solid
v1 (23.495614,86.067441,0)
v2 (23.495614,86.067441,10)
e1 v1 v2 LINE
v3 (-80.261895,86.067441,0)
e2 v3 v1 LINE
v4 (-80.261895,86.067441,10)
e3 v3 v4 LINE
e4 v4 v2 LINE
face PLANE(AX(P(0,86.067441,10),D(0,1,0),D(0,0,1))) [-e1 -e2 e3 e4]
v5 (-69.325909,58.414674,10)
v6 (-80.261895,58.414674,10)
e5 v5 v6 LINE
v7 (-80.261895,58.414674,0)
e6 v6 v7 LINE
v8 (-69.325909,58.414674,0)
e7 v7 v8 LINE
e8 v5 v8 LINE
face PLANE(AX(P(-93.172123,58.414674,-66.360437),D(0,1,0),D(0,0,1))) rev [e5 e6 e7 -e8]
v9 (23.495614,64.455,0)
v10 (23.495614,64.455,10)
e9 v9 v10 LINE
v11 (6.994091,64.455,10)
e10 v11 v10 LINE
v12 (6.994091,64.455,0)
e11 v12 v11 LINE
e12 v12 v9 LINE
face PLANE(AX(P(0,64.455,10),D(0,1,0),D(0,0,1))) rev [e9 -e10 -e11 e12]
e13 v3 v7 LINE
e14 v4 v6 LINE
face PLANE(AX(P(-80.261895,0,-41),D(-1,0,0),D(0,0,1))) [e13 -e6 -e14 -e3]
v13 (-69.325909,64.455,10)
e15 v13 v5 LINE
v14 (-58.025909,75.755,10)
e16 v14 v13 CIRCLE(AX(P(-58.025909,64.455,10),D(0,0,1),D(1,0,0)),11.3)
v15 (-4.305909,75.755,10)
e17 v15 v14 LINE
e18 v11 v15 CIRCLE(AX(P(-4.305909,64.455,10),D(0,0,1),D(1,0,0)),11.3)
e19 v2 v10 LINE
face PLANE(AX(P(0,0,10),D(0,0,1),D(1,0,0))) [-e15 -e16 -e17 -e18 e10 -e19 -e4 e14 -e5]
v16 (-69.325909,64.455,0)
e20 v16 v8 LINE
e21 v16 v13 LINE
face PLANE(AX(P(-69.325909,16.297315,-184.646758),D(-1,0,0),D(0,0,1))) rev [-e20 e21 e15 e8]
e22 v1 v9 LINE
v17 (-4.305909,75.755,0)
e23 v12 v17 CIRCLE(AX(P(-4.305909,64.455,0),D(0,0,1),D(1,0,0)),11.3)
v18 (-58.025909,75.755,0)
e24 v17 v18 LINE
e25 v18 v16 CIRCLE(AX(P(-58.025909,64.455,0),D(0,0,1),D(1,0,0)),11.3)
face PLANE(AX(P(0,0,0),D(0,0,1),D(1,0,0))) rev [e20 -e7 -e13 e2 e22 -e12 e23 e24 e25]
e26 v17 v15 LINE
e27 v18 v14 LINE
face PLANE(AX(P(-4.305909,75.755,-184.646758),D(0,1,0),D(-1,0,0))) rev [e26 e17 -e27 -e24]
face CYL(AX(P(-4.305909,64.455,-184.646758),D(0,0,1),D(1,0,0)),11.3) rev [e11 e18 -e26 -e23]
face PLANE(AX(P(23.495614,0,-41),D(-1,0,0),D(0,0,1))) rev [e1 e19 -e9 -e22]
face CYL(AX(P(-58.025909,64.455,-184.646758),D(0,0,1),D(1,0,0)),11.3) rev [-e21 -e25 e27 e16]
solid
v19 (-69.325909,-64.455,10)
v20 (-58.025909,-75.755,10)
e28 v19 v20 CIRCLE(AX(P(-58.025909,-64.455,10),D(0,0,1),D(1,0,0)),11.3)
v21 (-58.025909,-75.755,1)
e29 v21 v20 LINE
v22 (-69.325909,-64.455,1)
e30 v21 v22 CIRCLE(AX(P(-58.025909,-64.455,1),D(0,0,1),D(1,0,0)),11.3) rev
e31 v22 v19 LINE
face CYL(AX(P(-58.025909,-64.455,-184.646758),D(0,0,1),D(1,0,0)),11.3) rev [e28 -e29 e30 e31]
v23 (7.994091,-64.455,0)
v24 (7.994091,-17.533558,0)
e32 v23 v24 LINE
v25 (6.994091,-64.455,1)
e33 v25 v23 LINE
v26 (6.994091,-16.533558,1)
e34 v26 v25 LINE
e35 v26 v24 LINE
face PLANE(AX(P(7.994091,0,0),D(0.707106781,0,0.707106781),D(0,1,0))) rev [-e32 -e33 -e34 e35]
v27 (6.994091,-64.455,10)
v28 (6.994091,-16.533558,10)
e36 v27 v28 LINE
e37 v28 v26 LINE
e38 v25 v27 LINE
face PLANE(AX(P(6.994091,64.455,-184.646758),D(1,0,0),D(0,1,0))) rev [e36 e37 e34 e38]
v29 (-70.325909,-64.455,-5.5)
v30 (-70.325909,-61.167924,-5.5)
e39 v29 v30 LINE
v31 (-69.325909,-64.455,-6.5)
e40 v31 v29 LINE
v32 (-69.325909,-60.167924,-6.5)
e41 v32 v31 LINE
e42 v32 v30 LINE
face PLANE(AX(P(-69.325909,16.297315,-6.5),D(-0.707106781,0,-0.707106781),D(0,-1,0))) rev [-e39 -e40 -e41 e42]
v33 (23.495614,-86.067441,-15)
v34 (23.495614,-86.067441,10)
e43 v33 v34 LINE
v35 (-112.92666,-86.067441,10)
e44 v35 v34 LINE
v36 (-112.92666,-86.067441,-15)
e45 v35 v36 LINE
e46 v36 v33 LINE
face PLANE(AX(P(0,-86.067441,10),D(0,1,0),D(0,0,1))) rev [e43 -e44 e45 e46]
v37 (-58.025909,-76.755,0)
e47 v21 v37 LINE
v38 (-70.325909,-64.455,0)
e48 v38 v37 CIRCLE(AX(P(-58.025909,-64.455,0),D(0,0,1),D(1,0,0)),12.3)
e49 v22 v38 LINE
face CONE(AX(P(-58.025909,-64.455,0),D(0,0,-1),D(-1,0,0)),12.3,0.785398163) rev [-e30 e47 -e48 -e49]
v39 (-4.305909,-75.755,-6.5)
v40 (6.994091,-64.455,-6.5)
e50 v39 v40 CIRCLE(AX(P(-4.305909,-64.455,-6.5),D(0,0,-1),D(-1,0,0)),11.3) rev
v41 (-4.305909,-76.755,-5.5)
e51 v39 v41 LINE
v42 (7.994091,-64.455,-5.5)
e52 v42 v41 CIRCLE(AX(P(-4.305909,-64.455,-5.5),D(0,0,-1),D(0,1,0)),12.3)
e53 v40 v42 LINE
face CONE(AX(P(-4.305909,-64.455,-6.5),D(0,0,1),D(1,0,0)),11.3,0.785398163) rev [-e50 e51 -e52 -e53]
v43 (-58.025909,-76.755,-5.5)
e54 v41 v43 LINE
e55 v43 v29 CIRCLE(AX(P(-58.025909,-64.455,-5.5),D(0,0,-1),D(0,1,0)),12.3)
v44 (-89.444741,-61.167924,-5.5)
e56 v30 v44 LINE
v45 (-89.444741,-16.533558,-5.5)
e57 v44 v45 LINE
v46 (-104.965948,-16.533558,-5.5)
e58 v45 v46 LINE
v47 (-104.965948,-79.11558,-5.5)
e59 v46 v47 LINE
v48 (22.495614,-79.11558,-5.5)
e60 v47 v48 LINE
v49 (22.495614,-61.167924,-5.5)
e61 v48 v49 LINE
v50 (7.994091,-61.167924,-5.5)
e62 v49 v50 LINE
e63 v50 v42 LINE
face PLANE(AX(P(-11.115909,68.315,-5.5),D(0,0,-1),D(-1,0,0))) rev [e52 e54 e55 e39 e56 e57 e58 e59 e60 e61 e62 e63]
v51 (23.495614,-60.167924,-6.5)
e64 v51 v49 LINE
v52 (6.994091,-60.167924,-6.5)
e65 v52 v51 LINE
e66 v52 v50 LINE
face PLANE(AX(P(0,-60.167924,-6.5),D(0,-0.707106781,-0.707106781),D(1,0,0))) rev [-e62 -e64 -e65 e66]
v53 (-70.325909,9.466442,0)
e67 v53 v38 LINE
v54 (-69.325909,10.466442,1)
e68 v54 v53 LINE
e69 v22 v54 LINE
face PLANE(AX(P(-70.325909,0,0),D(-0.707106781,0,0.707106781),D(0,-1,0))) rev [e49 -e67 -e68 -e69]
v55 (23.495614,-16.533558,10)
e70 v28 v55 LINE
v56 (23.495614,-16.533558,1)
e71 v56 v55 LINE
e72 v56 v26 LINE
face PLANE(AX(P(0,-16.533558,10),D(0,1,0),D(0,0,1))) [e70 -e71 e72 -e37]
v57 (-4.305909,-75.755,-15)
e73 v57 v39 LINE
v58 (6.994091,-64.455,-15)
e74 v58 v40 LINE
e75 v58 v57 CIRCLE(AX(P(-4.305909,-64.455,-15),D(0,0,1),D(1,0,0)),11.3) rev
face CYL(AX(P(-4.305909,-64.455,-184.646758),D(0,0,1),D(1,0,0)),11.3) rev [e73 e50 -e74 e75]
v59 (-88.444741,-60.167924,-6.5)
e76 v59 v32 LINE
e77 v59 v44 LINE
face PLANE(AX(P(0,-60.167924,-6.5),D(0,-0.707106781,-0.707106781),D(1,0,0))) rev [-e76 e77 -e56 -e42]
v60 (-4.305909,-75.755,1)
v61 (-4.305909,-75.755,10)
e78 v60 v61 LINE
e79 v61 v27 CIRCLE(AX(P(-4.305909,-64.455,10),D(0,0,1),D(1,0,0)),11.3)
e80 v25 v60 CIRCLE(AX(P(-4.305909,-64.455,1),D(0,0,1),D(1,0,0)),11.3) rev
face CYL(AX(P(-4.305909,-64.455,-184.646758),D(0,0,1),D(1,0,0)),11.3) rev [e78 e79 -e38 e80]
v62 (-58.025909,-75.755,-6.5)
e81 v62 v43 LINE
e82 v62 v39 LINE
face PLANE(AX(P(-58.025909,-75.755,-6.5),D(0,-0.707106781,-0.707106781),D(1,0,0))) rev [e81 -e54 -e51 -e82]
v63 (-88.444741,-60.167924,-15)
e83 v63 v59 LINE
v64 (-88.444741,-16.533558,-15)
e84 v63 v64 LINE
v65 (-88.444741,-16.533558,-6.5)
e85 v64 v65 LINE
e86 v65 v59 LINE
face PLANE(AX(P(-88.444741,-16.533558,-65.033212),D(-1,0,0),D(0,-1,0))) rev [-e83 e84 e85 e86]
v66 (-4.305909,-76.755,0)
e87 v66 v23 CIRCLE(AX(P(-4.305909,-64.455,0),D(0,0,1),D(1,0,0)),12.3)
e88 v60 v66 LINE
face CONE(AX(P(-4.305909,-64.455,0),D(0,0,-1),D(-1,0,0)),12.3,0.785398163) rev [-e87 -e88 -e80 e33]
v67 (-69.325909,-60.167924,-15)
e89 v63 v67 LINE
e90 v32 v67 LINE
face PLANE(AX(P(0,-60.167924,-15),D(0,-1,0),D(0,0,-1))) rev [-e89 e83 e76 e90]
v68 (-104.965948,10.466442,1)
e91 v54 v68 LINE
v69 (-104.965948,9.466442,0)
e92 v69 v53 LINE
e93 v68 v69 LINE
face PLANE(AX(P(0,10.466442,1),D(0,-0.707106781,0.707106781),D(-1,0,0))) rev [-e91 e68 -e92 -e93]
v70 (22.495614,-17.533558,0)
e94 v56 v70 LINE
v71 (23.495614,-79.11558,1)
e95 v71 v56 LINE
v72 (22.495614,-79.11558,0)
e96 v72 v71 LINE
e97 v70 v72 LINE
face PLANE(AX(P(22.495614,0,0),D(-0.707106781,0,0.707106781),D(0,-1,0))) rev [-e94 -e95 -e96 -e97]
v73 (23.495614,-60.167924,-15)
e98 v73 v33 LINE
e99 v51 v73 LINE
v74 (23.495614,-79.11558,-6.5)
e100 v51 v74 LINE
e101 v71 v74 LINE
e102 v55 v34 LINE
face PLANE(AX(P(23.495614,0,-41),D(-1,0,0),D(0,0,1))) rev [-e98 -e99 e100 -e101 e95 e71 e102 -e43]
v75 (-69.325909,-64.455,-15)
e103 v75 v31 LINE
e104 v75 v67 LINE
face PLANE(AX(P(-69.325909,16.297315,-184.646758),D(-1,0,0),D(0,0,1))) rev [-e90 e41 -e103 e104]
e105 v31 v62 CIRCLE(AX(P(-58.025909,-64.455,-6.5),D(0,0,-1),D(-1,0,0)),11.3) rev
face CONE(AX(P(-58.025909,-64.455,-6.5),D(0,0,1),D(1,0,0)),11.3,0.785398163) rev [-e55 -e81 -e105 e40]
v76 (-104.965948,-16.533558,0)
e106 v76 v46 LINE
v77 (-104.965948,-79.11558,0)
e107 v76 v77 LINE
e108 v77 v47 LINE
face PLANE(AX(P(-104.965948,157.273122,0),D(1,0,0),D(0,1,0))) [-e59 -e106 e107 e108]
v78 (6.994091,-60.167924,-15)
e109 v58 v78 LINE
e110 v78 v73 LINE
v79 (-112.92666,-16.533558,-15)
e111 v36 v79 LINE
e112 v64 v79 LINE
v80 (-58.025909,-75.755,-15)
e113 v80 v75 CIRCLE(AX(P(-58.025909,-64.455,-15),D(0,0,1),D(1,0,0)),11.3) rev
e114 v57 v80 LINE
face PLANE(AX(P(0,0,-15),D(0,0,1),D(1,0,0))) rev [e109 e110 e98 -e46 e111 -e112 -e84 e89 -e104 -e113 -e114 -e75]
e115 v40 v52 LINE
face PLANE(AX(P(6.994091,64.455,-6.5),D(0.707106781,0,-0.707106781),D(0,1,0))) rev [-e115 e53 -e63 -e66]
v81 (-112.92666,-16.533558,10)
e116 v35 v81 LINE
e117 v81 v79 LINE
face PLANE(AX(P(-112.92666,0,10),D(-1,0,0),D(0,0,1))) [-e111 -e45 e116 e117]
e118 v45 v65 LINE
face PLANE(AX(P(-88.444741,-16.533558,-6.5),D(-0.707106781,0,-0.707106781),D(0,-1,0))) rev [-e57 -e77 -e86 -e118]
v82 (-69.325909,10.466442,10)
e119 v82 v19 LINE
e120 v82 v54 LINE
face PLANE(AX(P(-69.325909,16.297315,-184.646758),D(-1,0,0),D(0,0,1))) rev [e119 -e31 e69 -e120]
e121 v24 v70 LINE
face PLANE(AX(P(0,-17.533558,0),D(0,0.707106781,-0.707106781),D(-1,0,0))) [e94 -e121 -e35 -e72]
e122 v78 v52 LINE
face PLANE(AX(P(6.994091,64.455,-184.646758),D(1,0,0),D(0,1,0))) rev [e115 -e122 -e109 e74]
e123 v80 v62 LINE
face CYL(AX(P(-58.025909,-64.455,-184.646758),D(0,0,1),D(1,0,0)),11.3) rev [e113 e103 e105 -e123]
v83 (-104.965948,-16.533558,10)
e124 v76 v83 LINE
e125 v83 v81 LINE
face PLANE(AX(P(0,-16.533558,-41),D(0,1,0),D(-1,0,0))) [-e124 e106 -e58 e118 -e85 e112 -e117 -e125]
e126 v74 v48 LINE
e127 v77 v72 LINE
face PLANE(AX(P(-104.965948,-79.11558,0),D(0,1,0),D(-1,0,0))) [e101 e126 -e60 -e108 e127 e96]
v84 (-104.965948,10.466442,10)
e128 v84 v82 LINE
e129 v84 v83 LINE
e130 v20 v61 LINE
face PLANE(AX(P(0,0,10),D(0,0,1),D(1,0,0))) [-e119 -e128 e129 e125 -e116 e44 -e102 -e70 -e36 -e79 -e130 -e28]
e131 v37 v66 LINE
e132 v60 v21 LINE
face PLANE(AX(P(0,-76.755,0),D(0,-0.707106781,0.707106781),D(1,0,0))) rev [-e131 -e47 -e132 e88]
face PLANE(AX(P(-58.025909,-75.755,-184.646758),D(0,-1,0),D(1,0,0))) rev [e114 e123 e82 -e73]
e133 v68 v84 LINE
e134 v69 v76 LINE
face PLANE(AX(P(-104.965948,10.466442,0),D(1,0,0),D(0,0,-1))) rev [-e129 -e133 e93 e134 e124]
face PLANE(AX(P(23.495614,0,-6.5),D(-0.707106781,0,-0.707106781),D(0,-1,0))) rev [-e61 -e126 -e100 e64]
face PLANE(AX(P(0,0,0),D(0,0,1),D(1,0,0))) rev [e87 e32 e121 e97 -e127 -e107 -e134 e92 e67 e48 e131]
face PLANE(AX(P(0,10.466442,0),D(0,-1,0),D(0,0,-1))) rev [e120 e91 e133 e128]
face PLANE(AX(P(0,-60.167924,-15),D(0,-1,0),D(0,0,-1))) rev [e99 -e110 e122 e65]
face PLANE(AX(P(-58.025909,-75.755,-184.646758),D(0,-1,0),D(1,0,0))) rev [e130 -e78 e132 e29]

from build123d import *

# Parameters (mm, degrees)
BOSS_EXTRUDE1_DEPTH = 10
BOSS_EXTRUDE2_START = -15
BOSS_EXTRUDE2_DEPTH = 15
CUT_EXTRUDE2_START  = -25
CUT_EXTRUDE2_DEPTH  = 25
SKETCH9_W           = 12.32377621
SKETCH9_H           = 20.190011783
SKETCH9_W_2         = 8.082915928
SKETCH9_H_2         = 19.897693181
SKETCH9_W_3         = 27.099227996
SKETCH9_H_3         = 21.612440871
SKETCH9_H_4         = 69.53388311
CUT_EXTRUDE3_DEPTH  = 51
SKETCH11_W          = 24.481918607
SKETCH11_H          = 43.634366614
BOSS_EXTRUDE4_DEPTH = 15
CAVITY3_START       = -5.5
CAVITY3_DEPTH       = 5.5
CUT_EXTRUDE4_DEPTH  = 10
SKETCH16_W          = 35.640039366
SKETCH16_H          = 10
BOSS_EXTRUDE8_DEPTH = 27
CHAMFER1_SIZE       = 1


# Read off the part's stored shape, not the designer's step: Cavity3
with BuildPart() as part:
    # Sketch2 → Boss-Extrude1 (new body)
    with BuildSketch(Plane.XY):
        with BuildLine():
            ThreePointArc((-69.025908971, 64.455), (-65.804083564, 72.233174593), (-58.025908971, 75.455))
            Line((-58.025908971, 75.455), (-4.305908971, 75.455))
            ThreePointArc((-4.305908971, 75.455), (3.472265622, 72.233174593), (6.694091029, 64.455))
            Line((6.694091029, 64.455), (50.59484207, 64.455))
            Line((50.59484207, 64.455), (50.59484207, 86.067440871))
            Line((50.59484207, 86.067440871), (-112.926660012, 86.067440871))
            Line((-112.926660012, 86.067440871), (-112.926660012, -86.067440871))
            Line((-112.926660012, -86.067440871), (50.59484207, -86.067440871))
            Line((50.59484207, -86.067440871), (50.59484207, -16.533557761))
            Line((50.59484207, -16.533557761), (6.694091029, -16.533557761))
            Line((6.694091029, -16.533557761), (6.694091029, -64.455))
            ThreePointArc((6.694091029, -64.455), (3.472265622, -72.233174593), (-4.305908971, -75.455))
            Line((-4.305908971, -75.455), (-58.025908971, -75.455))
            ThreePointArc((-58.025908971, -75.455), (-65.804083564, -72.233174593), (-69.025908971, -64.455))
            Line((-69.025908971, -64.455), (-69.025908971, 16.297314801))
            Line((-69.025908971, 16.297314801), (6.694091029, 16.297314801))
            Line((6.694091029, 16.297314801), (6.694091029, 33.387471945))
            Line((6.694091029, 33.387471945), (-69.025908971, 33.387471945))
            Line((-69.025908971, 33.387471945), (-69.025908971, 64.455))
        make_face()
    extrude(amount=BOSS_EXTRUDE1_DEPTH)

    # Sketch2<3> → Boss-Extrude2 (add)
    with BuildSketch(Plane.XY.offset(BOSS_EXTRUDE2_START)):
        with BuildLine():
            Line((-69.025908971, -60.167924375), (-112.926660012, -60.167924375))
            Line((-112.926660012, -60.167924375), (-112.926660012, -86.067440871))
            Line((-112.926660012, -86.067440871), (50.59484207, -86.067440871))
            Line((50.59484207, -86.067440871), (50.59484207, -60.167924375))
            Line((50.59484207, -60.167924375), (6.694091029, -60.167924375))
            Line((6.694091029, -60.167924375), (6.694091029, -64.455))
            ThreePointArc((6.694091029, -64.455), (3.472265622, -72.233174593), (-4.305908971, -75.455))
            Line((-4.305908971, -75.455), (-58.025908971, -75.455))
            ThreePointArc((-58.025908971, -75.455), (-65.804083564, -72.233174593), (-69.025908971, -64.455))
            Line((-69.025908971, -64.455), (-69.025908971, -60.167924375))
        make_face()
    extrude(amount=BOSS_EXTRUDE2_DEPTH)

    # Sketch7 → Cut-Extrude2 (cut)
    with BuildSketch(Plane.XY.offset(10).offset(CUT_EXTRUDE2_START)):
        with BuildLine():
            Line((-69.325908971, 33.387471945), (-69.325908971, 16.297314801))
            Line((-69.325908971, 16.297314801), (-69.325908971, -64.455))
            ThreePointArc((-69.325908971, -64.455), (-66.016215599, -72.445306627), (-58.025908971, -75.755))
            Line((-58.025908971, -75.755), (-4.305908971, -75.755))
            ThreePointArc((-4.305908971, -75.755), (3.684397656, -72.445306627), (6.994091029, -64.455))
            Line((6.994091029, -64.455), (6.994091029, -16.533557761))
            Line((6.994091029, -16.533557761), (6.994091029, 64.455))
            ThreePointArc((6.994091029, 64.455), (3.684397656, 72.445306627), (-4.305908971, 75.755))
            Line((-4.305908971, 75.755), (-58.025908971, 75.755))
            ThreePointArc((-58.025908971, 75.755), (-66.016215599, 72.445306627), (-69.325908971, 64.455))
            Line((-69.325908971, 64.455), (-69.325908971, 33.387471945))
        make_face()
    extrude(amount=CUT_EXTRUDE2_DEPTH, mode=Mode.SUBTRACT)

    # Sketch9 → Cut-Extrude3 (cut)
    with BuildSketch(Plane.XY.offset(10)):
        with Locations((-106.764771907, 13.459141312)):
            Rectangle(SKETCH9_W, SKETCH9_H)
        with Locations((-116.968117976, 13.459141312)):
            Rectangle(SKETCH9_W_2, SKETCH9_H)
        Polygon((-122.798498513, -16.533557761), (-112.926660012, -16.533557761), (-112.926660012, 3.36413542), (-121.00957594, 3.36413542), (-121.00957594, 23.554147203), (-122.798498513, 23.554147203), align=None)
        with Locations((-106.764771907, -6.584711171)):
            Rectangle(SKETCH9_W, SKETCH9_H_2)
        Polygon((-100.602883802, 23.554147203), (-100.602883802, 3.36413542), (-80.261895125, 3.36413542), (-80.261895125, 86.067440871), (-112.926660012, 86.067440871), (-112.926660012, 23.554147203), align=None)
        Polygon((50.59484207, -86.067440871), (23.495614074, -86.067440871), (23.495614074, -98.291356894), (80.343598041, -98.291356894), (80.343598041, 92.328281653), (23.495614074, 92.328281653), (23.495614074, 86.067440871), (50.59484207, 86.067440871), (50.59484207, 64.455), (23.495614074, 64.455), (23.495614074, -16.533557761), (50.59484207, -16.533557761), align=None)
        with Locations((37.045228072, 75.261220436)):
            Rectangle(SKETCH9_W_3, SKETCH9_H_3)
        with Locations((37.045228072, -51.300499316)):
            Rectangle(SKETCH9_W_3, SKETCH9_H_4)
    extrude(amount=-CUT_EXTRUDE3_DEPTH, mode=Mode.SUBTRACT)

    # Sketch11 → Boss-Extrude4 (add)
    with BuildSketch(Plane(origin=(0, 0, 0), x_dir=(-1, 0, 0), z_dir=(0, 0, -1))):
        with Locations((100.685700709, -38.350741068)):
            Rectangle(SKETCH11_W, SKETCH11_H)
    extrude(amount=BOSS_EXTRUDE4_DEPTH)

    # Cavity3 outline → Cavity3 (cut)
    with BuildSketch(Plane.XY.offset(CAVITY3_START)):
        with BuildLine():
            Line((-104.965948337, -79.115579866), (23.495614074, -79.115579866))
            Line((23.495614074, -79.115579866), (23.495614074, -60.167924375))
            Line((23.495614074, -60.167924375), (6.994091029, -60.167924375))
            Line((6.994091029, -60.167924375), (6.994091029, -64.455))
            ThreePointArc((6.994091029, -64.455), (3.684397656, -72.445306627), (-4.305908971, -75.755))
            Line((-4.305908971, -75.755), (-58.025908971, -75.755))
            ThreePointArc((-58.025908971, -75.755), (-66.016215598, -72.445306628), (-69.325908971, -64.455))
            Line((-69.325908971, -64.455), (-69.325908971, -60.167924375))
            Line((-69.325908971, -60.167924375), (-88.444741405, -60.167924375))
            Line((-88.444741405, -60.167924375), (-88.444741405, -16.533557761))
            Line((-88.444741405, -16.533557761), (-104.965948337, -16.533557761))
            Line((-104.965948337, -16.533557761), (-104.965948337, -79.115579866))
        make_face()
    extrude(amount=CAVITY3_DEPTH, mode=Mode.SUBTRACT)

    # Sketch14 → Cut-Extrude4 (cut)
    with BuildSketch(Plane.XY.offset(10)):
        with BuildLine():
            Line((-100.172122713, 9.640304973), (-55.174695682, 9.640304973))
            Line((-55.174695682, 9.640304973), (-55.174695682, 58.414674309))
            Line((-55.174695682, 58.414674309), (-93.172122713, 58.414674309))
            ThreePointArc((-93.172122713, 58.414674309), (-98.121870182, 56.364421777), (-100.172122713, 51.414674309))
            Line((-100.172122713, 51.414674309), (-100.172122713, 9.640304973))
        make_face()
    extrude(amount=-CUT_EXTRUDE4_DEPTH, mode=Mode.SUBTRACT)


with BuildPart() as cut_extrude4_piece_1:
    # of the separate pieces the step leaves, piece 1, a body of its own (cut_extrude4_pieces)
    add(part.part.solids().sort_by_distance((-100.602883802, -16.533557761, 0))[0])

    # Sketch16 → Boss-Extrude8 (add)
    with BuildSketch(Plane(origin=(0, -16.533557761, 0), x_dir=(1, 0, 0), z_dir=(0, 1, 0))):
        with Locations((-87.145928654, -5)):
            Rectangle(SKETCH16_W, SKETCH16_H)
    extrude(amount=BOSS_EXTRUDE8_DEPTH)

    # Chamfer1
    chamfer1_edges = [cut_extrude4_piece_1.edges().sort_by_distance(p)[0] for p in [
        (-78.885325188, -60.167924375, -5.5),
        (-69.325908971, -26.99427888, 0),
        (-66.016215598, -72.445306628, 0),
        (-31.165908971, -75.755, 0),
        (3.684397656, -72.445306627, 0),
        (6.994091029, -38.350741068, 0),
        (15.244852551, -16.533557761, 0),
        (23.495614074, -47.824568813, 0),
        (15.244852551, -60.167924375, -5.5),
        (-69.325908971, -62.311462187, -5.5),
        (3.684397656, -72.445306627, -5.5),
        (-87.145928654, 10.466442239, 0),
        (-31.165908971, -75.755, -5.5),
        (-66.016215598, -72.445306628, -5.5),
        (6.994091029, -62.311462187, -5.5),
        (23.495614074, -69.641752121, -5.5),
        (-88.444741405, -38.350741068, -5.5),
    ]]
    chamfer(chamfer1_edges, length=CHAMFER1_SIZE)


with BuildPart() as cut_extrude4_piece_2:
    # of the separate pieces the step leaves, piece 2, a body of its own (cut_extrude4_pieces)
    add(part.part.solids().sort_by_distance((-80.261895125, 58.414674309, 0))[0])


solid = Compound([cut_extrude4_piece_1.part, cut_extrude4_piece_2.part])
